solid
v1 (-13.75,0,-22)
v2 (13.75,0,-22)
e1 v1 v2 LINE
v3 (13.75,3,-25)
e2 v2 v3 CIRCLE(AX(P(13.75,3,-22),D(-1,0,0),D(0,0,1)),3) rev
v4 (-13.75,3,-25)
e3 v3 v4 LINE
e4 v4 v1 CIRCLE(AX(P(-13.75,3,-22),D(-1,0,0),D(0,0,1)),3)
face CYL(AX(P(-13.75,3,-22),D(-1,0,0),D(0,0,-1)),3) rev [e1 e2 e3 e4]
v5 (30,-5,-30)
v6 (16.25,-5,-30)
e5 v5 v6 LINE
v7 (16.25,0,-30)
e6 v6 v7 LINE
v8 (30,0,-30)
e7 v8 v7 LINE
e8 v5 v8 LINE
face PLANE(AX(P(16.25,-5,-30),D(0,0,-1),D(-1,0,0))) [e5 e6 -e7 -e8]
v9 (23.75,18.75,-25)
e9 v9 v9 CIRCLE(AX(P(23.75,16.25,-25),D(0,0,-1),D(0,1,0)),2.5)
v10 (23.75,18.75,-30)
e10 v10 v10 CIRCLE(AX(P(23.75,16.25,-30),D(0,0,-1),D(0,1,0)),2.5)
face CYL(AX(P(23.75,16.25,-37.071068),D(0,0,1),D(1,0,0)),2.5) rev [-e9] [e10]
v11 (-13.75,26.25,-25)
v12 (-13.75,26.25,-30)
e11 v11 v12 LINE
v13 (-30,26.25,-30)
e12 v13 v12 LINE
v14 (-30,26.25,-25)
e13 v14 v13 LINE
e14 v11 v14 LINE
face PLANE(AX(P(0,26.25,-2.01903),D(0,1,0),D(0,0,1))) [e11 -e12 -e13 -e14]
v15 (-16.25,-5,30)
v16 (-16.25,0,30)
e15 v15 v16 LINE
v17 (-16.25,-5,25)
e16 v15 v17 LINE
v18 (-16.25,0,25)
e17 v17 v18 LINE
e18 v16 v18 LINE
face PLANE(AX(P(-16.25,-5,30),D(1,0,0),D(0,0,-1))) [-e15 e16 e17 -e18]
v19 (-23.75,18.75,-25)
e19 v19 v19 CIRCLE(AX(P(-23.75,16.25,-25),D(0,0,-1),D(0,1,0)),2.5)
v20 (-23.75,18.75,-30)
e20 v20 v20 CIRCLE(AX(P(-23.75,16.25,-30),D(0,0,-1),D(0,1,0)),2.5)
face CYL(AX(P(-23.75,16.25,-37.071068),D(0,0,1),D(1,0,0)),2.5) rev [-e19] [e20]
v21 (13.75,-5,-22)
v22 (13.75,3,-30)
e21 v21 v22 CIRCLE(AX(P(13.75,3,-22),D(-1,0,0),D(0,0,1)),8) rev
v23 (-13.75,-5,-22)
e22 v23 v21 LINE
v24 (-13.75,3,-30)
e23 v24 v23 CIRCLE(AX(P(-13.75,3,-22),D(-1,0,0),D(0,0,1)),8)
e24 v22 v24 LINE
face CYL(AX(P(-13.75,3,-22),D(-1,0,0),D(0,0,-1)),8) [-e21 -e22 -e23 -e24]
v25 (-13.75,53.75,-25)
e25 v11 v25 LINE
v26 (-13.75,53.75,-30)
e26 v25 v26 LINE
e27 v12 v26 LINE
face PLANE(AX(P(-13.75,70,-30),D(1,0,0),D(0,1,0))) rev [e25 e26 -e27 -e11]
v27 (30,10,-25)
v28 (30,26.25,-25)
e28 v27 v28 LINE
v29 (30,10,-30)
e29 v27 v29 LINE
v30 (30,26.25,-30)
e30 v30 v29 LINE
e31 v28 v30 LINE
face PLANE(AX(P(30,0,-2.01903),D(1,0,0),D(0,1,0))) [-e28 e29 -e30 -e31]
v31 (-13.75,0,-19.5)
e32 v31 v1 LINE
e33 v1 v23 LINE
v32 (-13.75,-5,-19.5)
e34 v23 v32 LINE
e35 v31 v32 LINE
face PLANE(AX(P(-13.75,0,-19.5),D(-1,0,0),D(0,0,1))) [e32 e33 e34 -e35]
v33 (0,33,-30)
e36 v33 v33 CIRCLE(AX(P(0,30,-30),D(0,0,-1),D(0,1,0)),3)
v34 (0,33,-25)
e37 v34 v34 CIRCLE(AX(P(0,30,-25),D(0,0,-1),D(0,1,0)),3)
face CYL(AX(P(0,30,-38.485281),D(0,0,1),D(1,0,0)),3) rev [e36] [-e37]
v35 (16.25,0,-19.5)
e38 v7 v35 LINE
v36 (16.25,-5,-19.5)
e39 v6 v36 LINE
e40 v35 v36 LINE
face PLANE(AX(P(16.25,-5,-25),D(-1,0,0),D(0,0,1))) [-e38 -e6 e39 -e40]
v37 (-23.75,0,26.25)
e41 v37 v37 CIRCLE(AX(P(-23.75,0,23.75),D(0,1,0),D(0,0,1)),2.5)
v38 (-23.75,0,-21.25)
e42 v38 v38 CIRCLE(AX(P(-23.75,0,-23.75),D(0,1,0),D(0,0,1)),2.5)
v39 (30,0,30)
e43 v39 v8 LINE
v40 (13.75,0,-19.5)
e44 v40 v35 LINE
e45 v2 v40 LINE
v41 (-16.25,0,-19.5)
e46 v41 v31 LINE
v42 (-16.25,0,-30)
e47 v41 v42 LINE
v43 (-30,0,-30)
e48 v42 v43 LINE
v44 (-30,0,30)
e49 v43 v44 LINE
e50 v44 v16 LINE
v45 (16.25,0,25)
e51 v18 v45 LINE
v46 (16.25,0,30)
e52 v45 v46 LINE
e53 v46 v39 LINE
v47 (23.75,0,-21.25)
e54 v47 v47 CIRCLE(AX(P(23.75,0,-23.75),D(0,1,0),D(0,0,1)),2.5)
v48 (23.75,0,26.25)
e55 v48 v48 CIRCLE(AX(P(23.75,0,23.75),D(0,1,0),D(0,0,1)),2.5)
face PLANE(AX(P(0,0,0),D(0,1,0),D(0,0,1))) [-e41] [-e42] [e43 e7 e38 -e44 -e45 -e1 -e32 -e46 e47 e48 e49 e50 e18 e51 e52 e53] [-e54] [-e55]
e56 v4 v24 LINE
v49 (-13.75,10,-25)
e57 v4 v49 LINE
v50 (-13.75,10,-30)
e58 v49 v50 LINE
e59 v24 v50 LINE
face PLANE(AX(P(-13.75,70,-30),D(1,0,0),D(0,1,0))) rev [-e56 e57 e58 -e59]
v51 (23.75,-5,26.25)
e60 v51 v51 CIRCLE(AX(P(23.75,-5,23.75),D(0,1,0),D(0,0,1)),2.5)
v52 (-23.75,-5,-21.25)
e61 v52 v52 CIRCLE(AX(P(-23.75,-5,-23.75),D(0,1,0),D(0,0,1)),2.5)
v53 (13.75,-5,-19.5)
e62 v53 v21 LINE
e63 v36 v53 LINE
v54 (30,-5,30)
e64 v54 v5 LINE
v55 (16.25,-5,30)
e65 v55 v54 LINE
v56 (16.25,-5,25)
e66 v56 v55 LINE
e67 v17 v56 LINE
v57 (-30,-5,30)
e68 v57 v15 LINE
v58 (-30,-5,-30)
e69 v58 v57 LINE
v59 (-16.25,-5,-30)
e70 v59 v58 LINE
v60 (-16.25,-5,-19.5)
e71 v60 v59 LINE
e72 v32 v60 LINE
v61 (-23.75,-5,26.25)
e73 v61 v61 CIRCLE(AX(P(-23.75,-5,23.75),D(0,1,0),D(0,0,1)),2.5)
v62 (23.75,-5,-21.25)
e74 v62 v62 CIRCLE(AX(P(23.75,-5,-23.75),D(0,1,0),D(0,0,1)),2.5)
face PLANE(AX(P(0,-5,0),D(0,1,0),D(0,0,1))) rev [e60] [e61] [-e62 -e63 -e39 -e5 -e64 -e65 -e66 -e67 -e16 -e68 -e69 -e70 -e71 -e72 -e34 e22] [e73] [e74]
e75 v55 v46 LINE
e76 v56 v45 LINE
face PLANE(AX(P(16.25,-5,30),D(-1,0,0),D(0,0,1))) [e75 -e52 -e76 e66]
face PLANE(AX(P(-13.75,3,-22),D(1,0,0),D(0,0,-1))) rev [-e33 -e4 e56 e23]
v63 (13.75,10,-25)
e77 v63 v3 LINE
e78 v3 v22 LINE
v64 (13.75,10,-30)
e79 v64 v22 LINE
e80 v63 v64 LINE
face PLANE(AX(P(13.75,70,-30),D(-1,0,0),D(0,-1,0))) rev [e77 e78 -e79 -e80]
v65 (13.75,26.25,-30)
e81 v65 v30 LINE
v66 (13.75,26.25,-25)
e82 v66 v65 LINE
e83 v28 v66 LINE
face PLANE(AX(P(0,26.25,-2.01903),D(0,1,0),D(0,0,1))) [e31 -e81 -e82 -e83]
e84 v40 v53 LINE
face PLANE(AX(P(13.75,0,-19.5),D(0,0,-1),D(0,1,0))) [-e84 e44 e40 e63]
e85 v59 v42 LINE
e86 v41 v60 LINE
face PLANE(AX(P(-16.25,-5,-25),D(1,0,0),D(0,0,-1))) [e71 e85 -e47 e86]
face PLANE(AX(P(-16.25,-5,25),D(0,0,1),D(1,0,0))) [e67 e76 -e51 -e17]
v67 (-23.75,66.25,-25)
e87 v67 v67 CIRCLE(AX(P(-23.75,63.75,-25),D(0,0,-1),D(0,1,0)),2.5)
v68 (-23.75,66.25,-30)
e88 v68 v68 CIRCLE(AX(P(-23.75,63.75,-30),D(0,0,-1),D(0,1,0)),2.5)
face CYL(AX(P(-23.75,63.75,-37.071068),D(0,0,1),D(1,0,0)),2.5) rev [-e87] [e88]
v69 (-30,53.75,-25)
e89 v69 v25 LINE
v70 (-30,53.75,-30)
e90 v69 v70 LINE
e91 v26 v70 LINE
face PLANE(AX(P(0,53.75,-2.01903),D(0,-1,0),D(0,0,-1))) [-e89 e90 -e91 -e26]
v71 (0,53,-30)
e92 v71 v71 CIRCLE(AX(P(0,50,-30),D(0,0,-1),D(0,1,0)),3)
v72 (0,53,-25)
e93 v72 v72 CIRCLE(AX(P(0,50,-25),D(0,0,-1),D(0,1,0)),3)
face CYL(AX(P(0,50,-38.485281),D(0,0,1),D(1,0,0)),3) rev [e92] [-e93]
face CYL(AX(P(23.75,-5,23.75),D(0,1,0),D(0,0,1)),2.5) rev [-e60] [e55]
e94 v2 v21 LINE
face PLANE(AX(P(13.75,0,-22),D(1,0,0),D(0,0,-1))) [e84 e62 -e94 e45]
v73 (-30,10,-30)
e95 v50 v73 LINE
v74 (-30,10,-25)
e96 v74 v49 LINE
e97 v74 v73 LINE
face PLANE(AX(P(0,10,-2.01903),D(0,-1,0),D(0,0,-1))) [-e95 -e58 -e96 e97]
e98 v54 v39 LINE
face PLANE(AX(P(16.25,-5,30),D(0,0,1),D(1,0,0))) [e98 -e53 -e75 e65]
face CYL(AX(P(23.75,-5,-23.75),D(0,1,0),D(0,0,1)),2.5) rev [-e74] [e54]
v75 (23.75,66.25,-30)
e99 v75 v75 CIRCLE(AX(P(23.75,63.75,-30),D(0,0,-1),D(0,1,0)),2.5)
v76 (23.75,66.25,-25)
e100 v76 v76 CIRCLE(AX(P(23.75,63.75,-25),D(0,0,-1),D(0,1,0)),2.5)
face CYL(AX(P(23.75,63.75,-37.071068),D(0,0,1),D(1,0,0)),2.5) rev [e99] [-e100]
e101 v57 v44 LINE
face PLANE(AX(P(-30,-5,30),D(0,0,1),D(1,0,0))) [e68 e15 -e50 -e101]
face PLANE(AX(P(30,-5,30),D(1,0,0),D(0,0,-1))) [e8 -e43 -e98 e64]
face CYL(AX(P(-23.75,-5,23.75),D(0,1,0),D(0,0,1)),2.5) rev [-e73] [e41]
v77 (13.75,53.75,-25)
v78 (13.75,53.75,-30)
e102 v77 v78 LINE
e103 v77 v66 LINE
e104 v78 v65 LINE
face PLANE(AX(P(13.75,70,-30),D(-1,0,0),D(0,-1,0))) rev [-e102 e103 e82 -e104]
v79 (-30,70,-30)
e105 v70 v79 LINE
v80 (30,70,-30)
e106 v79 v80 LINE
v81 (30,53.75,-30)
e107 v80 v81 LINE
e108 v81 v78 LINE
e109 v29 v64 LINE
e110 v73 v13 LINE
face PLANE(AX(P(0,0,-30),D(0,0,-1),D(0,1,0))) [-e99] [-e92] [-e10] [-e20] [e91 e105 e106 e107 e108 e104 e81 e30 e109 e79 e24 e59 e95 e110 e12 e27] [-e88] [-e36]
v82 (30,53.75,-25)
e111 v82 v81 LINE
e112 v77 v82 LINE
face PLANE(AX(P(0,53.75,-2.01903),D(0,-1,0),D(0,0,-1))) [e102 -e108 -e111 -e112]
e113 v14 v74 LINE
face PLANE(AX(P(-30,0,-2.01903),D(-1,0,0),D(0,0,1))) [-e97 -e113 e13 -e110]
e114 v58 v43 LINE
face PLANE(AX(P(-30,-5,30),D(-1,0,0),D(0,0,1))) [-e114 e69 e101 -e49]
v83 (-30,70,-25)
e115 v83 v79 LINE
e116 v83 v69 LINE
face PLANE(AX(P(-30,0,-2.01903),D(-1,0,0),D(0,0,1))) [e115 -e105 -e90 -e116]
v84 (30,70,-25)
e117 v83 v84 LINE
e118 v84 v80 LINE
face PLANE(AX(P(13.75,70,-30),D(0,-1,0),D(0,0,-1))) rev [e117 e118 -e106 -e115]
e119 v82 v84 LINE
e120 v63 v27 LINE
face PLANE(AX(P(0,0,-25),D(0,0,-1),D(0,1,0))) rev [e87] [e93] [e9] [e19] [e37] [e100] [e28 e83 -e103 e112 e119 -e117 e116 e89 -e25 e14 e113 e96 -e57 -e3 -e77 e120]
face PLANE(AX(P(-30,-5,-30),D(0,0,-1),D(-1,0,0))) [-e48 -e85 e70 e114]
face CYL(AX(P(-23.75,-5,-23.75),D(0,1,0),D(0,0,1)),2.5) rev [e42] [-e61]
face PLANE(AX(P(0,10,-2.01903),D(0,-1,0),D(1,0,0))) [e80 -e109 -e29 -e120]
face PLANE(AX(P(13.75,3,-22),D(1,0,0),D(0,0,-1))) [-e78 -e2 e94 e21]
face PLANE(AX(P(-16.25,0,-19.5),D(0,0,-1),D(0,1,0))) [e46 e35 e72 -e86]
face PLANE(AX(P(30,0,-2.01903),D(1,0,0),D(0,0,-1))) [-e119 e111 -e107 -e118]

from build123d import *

# Parameters (mm, degrees)
SKETCH_1_R                        = 2.5
SM_BASE_FLANGE_1_DEPTH            = 5
SM_EDGE_FLANGE_1_STRIP_W          = 26
SM_EDGE_FLANGE_1_STRIP_H          = 5
SM_EDGE_FLANGE_1_STRIP_CUT_DEPTH  = 27.5
SM_EDGE_FLANGE_1_RELIEF_W         = 28.5
SM_EDGE_FLANGE_1_RELIEF_H         = 2.5
SM_EDGE_FLANGE_1_RELIEF_CUT_DEPTH = 5
SM_EDGE_FLANGE_1_DEPTH            = 27.5
EXTRUDE_START                     = -30
SKETCH_9_W                        = 16.25
SKETCH_9_H                        = 16.25
EXTRUDE_1_DEPTH                   = 5
CUT_EXTRUDE_START                 = -30
SKETCH_10_R                       = 3
CUT_EXTRUDE_1_DEPTH               = 5
SKETCH_11_R                       = 2.5
CUT_EXTRUDE_2_DEPTH               = 5


# Sheet-metal steps are written as plain solids
with BuildPart() as part:
    # Sketch 1 → 基体-法兰1 (new body)
    with BuildSketch(Plane(origin=(0, 0, 0), x_dir=(1, 0, 0), z_dir=(0, 1, 0))):
        Polygon((-16.25, 25), (-16.25, 30), (-30, 30), (-30, -30), (-16.25, -30), (-16.25, -25), (16.25, -25), (16.25, -30), (30, -30), (30, 30), (16.25, 30), (16.25, 25), align=None)
        with Locations(Location((-23.75, 23.75, 0), (0, 0, 270))):
            Circle(SKETCH_1_R, mode=Mode.SUBTRACT)
        with Locations(Location((23.75, 23.75, 0), (0, 0, 270))):
            Circle(SKETCH_1_R, mode=Mode.SUBTRACT)
        with Locations(Location((-23.75, -23.75, 0), (0, 0, 270))):
            Circle(SKETCH_1_R, mode=Mode.SUBTRACT)
        with Locations(Location((23.75, -23.75, 0), (0, 0, 270))):
            Circle(SKETCH_1_R, mode=Mode.SUBTRACT)
    extrude(amount=-SM_BASE_FLANGE_1_DEPTH)

    # 边线-法兰1 strip (across the edge) → 边线-法兰1 strip cut (cut)
    with BuildSketch(Plane(origin=(13.75, 0, -25), x_dir=(0, 0, 1), z_dir=(-1, 0, 0))):
        with Locations((-10, -2.5)):
            Rectangle(SM_EDGE_FLANGE_1_STRIP_W, SM_EDGE_FLANGE_1_STRIP_H)
    extrude(amount=SM_EDGE_FLANGE_1_STRIP_CUT_DEPTH, mode=Mode.SUBTRACT)

    # 边线-法兰1 relief (on the sheet) → 边线-法兰1 relief cut (cut)
    with BuildSketch(Plane(origin=(13.75, 0, -22), x_dir=(0, 0, 1), z_dir=(0, 1, 0))):
        with Locations((-11.75, 1.25)):
            Rectangle(SM_EDGE_FLANGE_1_RELIEF_W, SM_EDGE_FLANGE_1_RELIEF_H)
        with Locations((-11.75, -28.75)):
            Rectangle(SM_EDGE_FLANGE_1_RELIEF_W, SM_EDGE_FLANGE_1_RELIEF_H)
    extrude(amount=-SM_EDGE_FLANGE_1_RELIEF_CUT_DEPTH, mode=Mode.SUBTRACT)

    # 边线-法兰1 section (across the edge) → 边线-法兰1 (add)
    with BuildSketch(Plane(origin=(13.75, 0, -25), x_dir=(0, 0, 1), z_dir=(-1, 0, 0))):
        with BuildLine():
            Line((-5, 3), (-5, 70))
            Line((-5, 70), (0, 70))
            Line((0, 70), (0, 3))
            ThreePointArc((0, 3), (0.878679656, 0.878679656), (3, 0))
            Line((3, 0), (3, -5))
            ThreePointArc((3, -5), (-2.656854249, -2.656854249), (-5, 3))
        make_face()
    extrude(amount=SM_EDGE_FLANGE_1_DEPTH)

    # 草图9 → 凸台-拉伸1 (add)
    with BuildSketch(Plane.XY.offset(EXTRUDE_START)):
        with Locations((-21.875, 61.875)):
            Rectangle(SKETCH_9_W, SKETCH_9_H)
        with Locations((21.875, 61.875)):
            Rectangle(SKETCH_9_W, SKETCH_9_H)
        with Locations((-21.875, 18.125)):
            Rectangle(SKETCH_9_W, SKETCH_9_H)
        with Locations((21.875, 18.125)):
            Rectangle(SKETCH_9_W, SKETCH_9_H)
    extrude(amount=EXTRUDE_1_DEPTH)

    # 草图10 → 切除-拉伸1 (cut)
    with BuildSketch(Plane.XY.offset(CUT_EXTRUDE_START)):
        with Locations(Location((0, 50, 0), (0, 0, 90))):
            Circle(SKETCH_10_R)
        with Locations(Location((0, 30, 0), (0, 0, 90))):
            Circle(SKETCH_10_R)
    extrude(amount=CUT_EXTRUDE_1_DEPTH, mode=Mode.SUBTRACT)

    # 草图11 → 切除-拉伸2 (cut)
    with BuildSketch(Plane.XY.offset(CUT_EXTRUDE_START)):
        with Locations(Location((-23.75, 16.25, 0), (0, 0, 90))):
            Circle(SKETCH_11_R)
        with Locations(Location((-23.75, 63.75, 0), (0, 0, 90))):
            Circle(SKETCH_11_R)
        with Locations(Location((23.75, 63.75, 0), (0, 0, 90))):
            Circle(SKETCH_11_R)
        with Locations(Location((23.75, 16.25, 0), (0, 0, 90))):
            Circle(SKETCH_11_R)
    extrude(amount=CUT_EXTRUDE_2_DEPTH, mode=Mode.SUBTRACT)


solid = part.part
